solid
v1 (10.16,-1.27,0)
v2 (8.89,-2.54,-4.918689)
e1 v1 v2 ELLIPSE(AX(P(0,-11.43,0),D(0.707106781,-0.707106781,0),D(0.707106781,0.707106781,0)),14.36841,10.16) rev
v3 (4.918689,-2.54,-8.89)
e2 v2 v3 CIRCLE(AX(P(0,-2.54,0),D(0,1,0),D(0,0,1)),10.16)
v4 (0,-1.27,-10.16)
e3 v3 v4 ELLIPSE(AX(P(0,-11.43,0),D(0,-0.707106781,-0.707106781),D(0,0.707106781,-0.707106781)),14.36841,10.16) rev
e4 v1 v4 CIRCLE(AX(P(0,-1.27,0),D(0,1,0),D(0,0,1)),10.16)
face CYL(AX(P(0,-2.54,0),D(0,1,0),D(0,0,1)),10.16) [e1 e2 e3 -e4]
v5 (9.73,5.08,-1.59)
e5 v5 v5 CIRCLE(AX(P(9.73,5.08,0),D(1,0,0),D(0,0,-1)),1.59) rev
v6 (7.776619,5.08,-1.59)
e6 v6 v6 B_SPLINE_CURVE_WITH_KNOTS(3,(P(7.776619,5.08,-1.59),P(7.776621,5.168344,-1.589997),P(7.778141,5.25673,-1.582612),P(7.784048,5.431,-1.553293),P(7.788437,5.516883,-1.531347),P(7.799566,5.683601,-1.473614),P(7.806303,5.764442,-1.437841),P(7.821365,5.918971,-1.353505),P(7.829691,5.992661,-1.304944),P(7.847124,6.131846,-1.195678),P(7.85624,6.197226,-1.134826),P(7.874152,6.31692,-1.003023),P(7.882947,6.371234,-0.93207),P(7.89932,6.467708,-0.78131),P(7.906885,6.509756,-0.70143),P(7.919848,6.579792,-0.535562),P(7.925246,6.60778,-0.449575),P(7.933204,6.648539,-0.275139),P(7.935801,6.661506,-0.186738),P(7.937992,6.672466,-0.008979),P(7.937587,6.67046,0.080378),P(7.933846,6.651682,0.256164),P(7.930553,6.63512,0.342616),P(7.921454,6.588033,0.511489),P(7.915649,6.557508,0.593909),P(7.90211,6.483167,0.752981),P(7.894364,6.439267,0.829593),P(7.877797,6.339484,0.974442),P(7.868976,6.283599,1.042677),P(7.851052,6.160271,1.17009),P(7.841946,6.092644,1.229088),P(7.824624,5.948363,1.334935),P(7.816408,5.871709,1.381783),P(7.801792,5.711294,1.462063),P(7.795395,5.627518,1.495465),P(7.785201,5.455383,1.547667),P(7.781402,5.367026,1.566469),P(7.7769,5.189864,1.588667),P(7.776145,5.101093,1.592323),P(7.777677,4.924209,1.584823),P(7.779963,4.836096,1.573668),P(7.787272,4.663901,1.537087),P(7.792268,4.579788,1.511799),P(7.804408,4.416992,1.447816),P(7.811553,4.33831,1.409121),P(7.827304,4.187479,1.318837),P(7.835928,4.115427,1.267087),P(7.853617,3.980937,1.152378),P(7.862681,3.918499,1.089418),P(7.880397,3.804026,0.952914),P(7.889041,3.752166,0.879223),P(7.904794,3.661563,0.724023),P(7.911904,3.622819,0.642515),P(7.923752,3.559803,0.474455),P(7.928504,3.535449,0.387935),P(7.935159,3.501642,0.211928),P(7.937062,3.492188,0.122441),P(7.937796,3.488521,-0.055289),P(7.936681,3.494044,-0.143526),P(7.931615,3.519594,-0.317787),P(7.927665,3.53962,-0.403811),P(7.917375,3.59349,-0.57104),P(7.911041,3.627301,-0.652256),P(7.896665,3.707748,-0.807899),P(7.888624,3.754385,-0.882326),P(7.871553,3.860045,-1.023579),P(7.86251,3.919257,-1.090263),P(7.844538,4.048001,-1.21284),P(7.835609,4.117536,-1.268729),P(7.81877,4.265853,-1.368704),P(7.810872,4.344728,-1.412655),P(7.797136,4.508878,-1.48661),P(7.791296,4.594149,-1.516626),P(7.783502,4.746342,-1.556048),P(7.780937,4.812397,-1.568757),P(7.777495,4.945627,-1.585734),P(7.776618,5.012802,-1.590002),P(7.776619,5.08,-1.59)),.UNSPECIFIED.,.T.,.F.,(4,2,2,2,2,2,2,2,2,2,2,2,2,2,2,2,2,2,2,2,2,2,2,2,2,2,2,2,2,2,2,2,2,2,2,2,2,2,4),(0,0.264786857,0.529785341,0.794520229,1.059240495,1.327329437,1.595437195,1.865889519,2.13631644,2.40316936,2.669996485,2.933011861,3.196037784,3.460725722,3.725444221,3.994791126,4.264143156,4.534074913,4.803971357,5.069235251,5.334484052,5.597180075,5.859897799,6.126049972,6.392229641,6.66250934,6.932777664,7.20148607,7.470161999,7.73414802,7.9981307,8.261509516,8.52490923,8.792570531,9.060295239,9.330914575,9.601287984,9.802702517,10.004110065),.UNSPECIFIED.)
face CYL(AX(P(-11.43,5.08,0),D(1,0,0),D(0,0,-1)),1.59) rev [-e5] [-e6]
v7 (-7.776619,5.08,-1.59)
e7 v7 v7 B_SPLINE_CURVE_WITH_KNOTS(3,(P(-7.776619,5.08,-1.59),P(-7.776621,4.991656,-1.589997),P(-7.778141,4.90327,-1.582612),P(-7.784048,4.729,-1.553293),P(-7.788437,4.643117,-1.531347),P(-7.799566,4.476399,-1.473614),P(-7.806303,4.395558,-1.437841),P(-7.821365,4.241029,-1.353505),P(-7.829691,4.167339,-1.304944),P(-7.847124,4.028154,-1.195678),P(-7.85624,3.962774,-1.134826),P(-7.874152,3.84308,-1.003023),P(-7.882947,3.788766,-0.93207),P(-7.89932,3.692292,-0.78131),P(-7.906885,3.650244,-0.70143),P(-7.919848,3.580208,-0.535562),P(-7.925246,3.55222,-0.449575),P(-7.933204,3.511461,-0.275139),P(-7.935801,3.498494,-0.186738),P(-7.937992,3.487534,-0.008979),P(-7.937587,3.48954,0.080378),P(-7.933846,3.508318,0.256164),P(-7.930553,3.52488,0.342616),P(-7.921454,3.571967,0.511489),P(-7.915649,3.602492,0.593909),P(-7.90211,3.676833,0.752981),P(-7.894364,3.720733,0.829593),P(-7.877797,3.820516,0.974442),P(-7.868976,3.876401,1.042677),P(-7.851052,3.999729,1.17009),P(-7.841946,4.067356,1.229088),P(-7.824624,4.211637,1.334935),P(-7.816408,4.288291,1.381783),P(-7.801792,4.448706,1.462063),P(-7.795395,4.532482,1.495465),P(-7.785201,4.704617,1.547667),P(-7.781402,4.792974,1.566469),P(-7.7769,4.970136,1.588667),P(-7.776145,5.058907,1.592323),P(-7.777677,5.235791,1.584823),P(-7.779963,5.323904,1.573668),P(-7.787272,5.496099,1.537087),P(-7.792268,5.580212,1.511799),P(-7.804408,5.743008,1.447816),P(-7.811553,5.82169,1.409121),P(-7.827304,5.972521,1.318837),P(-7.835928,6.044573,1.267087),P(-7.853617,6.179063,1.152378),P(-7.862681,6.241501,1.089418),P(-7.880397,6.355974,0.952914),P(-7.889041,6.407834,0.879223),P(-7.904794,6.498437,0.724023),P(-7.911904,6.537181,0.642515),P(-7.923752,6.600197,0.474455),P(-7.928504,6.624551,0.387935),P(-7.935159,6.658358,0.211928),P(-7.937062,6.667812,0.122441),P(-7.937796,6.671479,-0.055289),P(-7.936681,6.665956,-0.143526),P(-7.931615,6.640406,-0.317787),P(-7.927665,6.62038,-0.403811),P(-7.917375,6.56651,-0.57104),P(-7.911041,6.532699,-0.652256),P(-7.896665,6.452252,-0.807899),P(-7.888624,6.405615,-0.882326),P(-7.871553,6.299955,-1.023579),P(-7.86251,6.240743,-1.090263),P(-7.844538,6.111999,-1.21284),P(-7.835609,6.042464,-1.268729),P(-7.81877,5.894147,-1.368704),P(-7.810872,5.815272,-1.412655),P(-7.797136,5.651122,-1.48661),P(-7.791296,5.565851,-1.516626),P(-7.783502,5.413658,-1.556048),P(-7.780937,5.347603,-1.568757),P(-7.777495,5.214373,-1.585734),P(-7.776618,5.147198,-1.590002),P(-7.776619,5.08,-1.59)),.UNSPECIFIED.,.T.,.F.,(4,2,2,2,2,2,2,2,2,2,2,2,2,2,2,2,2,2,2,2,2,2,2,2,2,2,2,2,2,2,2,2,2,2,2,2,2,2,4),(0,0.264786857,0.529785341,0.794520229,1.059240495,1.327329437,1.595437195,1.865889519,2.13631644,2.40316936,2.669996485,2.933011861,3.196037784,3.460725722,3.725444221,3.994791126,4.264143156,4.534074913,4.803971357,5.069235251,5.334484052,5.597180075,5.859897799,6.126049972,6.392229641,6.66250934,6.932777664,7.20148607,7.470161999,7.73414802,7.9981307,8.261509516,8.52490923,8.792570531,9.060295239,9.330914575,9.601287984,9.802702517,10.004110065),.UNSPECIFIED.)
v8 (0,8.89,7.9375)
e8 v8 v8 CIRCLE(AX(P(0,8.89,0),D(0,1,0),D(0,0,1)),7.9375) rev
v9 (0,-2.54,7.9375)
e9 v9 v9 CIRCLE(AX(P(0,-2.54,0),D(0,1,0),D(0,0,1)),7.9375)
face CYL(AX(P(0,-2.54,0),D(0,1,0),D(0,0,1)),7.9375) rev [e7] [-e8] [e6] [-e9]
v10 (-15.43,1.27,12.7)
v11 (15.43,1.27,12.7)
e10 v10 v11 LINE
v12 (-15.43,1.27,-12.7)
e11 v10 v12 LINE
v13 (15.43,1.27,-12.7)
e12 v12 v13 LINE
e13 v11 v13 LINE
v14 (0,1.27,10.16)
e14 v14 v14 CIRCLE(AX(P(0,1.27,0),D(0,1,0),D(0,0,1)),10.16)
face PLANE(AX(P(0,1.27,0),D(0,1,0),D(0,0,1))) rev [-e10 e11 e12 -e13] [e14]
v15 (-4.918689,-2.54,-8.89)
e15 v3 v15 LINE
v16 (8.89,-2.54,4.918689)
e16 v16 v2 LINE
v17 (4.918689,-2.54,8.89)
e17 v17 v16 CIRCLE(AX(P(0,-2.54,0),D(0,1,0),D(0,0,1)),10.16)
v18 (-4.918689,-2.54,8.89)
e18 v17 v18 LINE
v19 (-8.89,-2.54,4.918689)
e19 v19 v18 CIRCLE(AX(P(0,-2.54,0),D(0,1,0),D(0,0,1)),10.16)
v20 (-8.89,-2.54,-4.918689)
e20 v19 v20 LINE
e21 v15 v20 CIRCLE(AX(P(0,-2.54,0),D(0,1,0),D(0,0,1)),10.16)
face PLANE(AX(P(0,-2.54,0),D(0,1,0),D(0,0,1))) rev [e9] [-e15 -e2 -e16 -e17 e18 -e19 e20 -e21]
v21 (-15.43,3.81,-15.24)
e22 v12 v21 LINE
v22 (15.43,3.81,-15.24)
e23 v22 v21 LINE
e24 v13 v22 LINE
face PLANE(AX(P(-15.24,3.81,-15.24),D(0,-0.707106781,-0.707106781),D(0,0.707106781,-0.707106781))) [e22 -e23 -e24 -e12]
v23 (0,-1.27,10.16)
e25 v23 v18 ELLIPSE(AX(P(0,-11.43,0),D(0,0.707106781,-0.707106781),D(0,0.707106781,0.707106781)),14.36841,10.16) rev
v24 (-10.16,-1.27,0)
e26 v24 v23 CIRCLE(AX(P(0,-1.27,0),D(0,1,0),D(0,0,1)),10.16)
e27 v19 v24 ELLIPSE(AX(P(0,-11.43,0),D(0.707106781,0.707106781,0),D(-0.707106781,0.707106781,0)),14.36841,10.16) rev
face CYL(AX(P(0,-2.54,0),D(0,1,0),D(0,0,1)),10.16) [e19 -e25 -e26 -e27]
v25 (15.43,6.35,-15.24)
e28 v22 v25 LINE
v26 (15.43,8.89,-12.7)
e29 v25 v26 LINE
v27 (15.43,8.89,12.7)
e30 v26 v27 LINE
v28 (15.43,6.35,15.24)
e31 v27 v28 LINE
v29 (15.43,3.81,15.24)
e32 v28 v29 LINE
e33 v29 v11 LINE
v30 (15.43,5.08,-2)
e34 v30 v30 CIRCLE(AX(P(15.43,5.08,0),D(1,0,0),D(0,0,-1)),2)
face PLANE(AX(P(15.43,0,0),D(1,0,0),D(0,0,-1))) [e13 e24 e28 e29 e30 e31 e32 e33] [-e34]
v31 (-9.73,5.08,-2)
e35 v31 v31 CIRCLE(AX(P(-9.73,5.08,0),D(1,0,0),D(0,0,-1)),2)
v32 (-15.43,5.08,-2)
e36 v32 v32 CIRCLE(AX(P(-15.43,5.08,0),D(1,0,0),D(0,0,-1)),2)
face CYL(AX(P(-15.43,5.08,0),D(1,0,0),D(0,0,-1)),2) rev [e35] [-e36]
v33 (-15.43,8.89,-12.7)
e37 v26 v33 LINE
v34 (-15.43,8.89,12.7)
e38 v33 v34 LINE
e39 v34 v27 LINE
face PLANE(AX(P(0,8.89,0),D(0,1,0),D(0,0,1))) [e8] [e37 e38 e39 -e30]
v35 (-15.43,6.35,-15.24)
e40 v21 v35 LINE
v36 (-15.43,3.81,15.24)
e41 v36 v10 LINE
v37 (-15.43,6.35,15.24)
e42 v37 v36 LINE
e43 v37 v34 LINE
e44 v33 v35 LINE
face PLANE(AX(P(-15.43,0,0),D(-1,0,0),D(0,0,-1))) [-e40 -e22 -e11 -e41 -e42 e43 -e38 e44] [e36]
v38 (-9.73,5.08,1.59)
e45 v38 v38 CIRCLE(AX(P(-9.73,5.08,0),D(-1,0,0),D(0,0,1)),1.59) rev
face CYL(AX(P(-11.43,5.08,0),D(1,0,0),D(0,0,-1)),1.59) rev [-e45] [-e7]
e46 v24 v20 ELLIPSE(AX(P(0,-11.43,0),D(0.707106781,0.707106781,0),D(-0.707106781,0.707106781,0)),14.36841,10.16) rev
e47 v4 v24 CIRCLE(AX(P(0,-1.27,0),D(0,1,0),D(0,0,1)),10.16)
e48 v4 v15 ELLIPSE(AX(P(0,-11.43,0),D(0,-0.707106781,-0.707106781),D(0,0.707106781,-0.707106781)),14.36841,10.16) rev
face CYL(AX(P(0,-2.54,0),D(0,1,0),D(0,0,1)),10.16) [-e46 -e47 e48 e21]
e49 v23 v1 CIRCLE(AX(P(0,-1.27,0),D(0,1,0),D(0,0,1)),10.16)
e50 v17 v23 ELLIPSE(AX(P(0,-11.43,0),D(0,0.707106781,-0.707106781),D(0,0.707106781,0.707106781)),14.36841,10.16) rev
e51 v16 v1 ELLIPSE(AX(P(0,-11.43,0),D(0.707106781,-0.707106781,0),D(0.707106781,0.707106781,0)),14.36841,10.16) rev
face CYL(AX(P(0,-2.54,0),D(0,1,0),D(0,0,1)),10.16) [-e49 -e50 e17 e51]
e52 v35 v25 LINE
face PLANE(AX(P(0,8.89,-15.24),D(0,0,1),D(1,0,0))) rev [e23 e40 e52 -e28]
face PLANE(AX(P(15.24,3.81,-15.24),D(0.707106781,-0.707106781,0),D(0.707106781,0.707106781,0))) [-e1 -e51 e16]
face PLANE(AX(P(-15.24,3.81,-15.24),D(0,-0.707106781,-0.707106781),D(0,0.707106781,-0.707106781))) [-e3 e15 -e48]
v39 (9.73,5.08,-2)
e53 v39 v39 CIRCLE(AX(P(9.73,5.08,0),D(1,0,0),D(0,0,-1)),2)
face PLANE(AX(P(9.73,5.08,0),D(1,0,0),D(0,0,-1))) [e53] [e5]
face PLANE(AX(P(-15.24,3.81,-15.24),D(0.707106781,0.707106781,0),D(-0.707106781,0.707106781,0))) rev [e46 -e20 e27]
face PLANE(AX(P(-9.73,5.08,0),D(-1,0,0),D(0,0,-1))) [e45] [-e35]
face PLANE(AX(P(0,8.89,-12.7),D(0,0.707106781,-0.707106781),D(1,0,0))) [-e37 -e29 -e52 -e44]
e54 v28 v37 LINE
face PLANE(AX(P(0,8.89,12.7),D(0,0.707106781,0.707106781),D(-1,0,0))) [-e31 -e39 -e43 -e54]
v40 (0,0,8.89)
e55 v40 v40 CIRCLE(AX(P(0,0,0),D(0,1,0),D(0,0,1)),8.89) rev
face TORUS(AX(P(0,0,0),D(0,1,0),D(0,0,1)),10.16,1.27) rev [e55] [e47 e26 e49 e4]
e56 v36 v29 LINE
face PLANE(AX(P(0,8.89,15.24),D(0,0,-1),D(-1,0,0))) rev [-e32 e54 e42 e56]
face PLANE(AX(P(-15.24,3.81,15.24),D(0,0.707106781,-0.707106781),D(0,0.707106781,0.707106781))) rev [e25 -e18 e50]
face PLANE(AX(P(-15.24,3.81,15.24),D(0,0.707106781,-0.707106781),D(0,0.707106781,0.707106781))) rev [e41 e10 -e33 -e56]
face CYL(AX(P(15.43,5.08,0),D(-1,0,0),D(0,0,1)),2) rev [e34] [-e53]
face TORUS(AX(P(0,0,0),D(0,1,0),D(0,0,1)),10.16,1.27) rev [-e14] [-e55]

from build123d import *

# Parameters (mm, degrees)
BOSS_EXTRUDE1_DEPTH      = 2.54
BOSS_EXTRUDE1_DEPTH_BACK = 2.54
SKETCH4_R                = 10.16
CUT_EXTRUDE1_DEPTH       = 1.27
CUT_EXTRUDE1_DEPTH_BACK  = 1.27
SKETCH5_R                = 10.16
SKETCH5_R_2              = 8.89
FILLET1_R                = 1.27
SKETCH6_R                = 7.9375
CUT_EXTRUDE2_DEPTH       = 16.24
SKETCH7_W                = 30.48
SKETCH7_H                = 30.48
SKETCH7_R                = 10.16
BOSS_EXTRUDE2_DEPTH      = 1.27
BOSS_EXTRUDE3_START      = 1.27
SKETCH8_W                = 30.48
SKETCH8_H                = 30.48
SKETCH8_R                = 7.9375
BOSS_EXTRUDE3_DEPTH      = 1.27
CUT_EXTRUDE3_DEPTH       = 35.29
CUT_EXTRUDE4_DEPTH       = 22.886783683
CUT_EXTRUDE5_DEPTH       = 22.886783683
CUT_EXTRUDE6_DEPTH       = 22.886783683
SKETCH14_W               = 7.62
SKETCH14_H               = 9.930781058
CUT_EXTRUDE7_DEPTH       = 22.886783683
BOSS_EXTRUDE4_START      = 5.08
SKETCH15_W               = 22.86
SKETCH15_H               = 30.48
SKETCH15_R               = 7.9375
BOSS_EXTRUDE4_DEPTH      = 5.08
CUT_EXTRUDE8_DEPTH       = 22.022240604
CUT_EXTRUDE8_DEPTH_BACK  = 22.022240604
SKETCH16_R               = 1.59
SKETCH18_R               = 2
BOSS_EXTRUDE5_DEPTH      = 4
SKETCH19_R               = 2
CUT_EXTRUDE9_DEPTH       = 5.7
CHAMFER1_SIZE            = 2.54


with BuildPart() as part:
    # Sketch4 → Boss-Extrude1 (new, two sides: drawn at the far end of the back side and taken through both)
    with BuildSketch(Plane(origin=(0, 0, 0), x_dir=(1, 0, 0), z_dir=(0, 1, 0)).offset(-BOSS_EXTRUDE1_DEPTH_BACK)):
        with Locations(Location((0, 0, 0), (0, 0, 270))):
            Circle(SKETCH4_R)
    extrude(amount=BOSS_EXTRUDE1_DEPTH + BOSS_EXTRUDE1_DEPTH_BACK)

    # Sketch5 → Cut-Extrude1 (cut, two sides: drawn at the far end of the back side and taken through both)
    with BuildSketch(Plane(origin=(0, 0, 0), x_dir=(1, 0, 0), z_dir=(0, 1, 0)).offset(-CUT_EXTRUDE1_DEPTH_BACK)):
        with Locations(Location((0, 0, 0), (0, 0, 270))):
            Circle(SKETCH5_R)
        with Locations(Location((0, 0, 0), (0, 0, 270))):
            Circle(SKETCH5_R_2, mode=Mode.SUBTRACT)
    extrude(amount=CUT_EXTRUDE1_DEPTH + CUT_EXTRUDE1_DEPTH_BACK, mode=Mode.SUBTRACT)

    # Fillet1
    fillet1_edges = [part.edges().sort_by_distance(p)[0] for p in [
        (0, 1.27, -8.89),
        (0, -1.27, -8.89),
    ]]
    fillet(fillet1_edges, radius=FILLET1_R - 0.0001)  # a hair under: the kernel refuses the full size

    # Sketch6 → Cut-Extrude2 (cut, through all)
    with BuildSketch(Plane(origin=(0, 2.54, 0), x_dir=(1, 0, 0), z_dir=(0, 1, 0))):
        with Locations(Location((0, 0, 0), (0, 0, 270))):
            Circle(SKETCH6_R)
    extrude(amount=-CUT_EXTRUDE2_DEPTH, mode=Mode.SUBTRACT)

    # Sketch7 → Boss-Extrude2 (add)
    with BuildSketch(Plane(origin=(0, 2.54, 0), x_dir=(1, 0, 0), z_dir=(0, 1, 0))):
        Rectangle(SKETCH7_W, SKETCH7_H)
        with Locations(Location((0, 0, 0), (0, 0, 270))):
            Circle(SKETCH7_R, mode=Mode.SUBTRACT)
    extrude(amount=-BOSS_EXTRUDE2_DEPTH)

    # Sketch8 → Boss-Extrude3 (add)
    with BuildSketch(Plane(origin=(0, 2.54, 0), x_dir=(1, 0, 0), z_dir=(0, 1, 0)).offset(BOSS_EXTRUDE3_START)):
        Rectangle(SKETCH8_W, SKETCH8_H)
        with Locations(Location((0, 0, 0), (0, 0, 270))):
            Circle(SKETCH8_R, mode=Mode.SUBTRACT)
    extrude(amount=-BOSS_EXTRUDE3_DEPTH)

    # Sketch9 → Cut-Extrude3 (cut, through all)
    with BuildSketch(Plane.XY.offset(15.24)):
        Polygon((-15.24, 3.81), (-15.24, 1.27), (-12.7, 1.27), align=None)
    cut_extrude3 = extrude(amount=-CUT_EXTRUDE3_DEPTH, mode=Mode.SUBTRACT)

    # Mirror2: Cut-Extrude3 across plane
    add(cut_extrude3.mirror(Plane(origin=(0, 0, 0), x_dir=(0, 0, 1), z_dir=(1, 0, 0))), mode=Mode.SUBTRACT)

    # Sketch11 → Cut-Extrude4 (cut, symmetric)
    with BuildSketch(Plane(origin=(0, 0, 0), x_dir=(0, 0, -1), z_dir=(1, 0, 0))):
        Polygon((-15.24, 3.81), (-12.7, 1.27), (-15.24, 1.27), align=None)
    cut_extrude4 = extrude(amount=CUT_EXTRUDE4_DEPTH, both=True, mode=Mode.SUBTRACT)

    # Mirror3: Cut-Extrude4 across plane
    add(cut_extrude4.mirror(Plane.XY), mode=Mode.SUBTRACT)

    # Sketch12 → Cut-Extrude5 (cut, symmetric)
    with BuildSketch(Plane(origin=(0, 0, 0), x_dir=(0, 0, -1), z_dir=(1, 0, 0))):
        Polygon((-15.24, 3.81), (-5.498295506, -5.931704494), (-15.24, -5.931704494), align=None)
    cut_extrude5 = extrude(amount=CUT_EXTRUDE5_DEPTH, both=True, mode=Mode.SUBTRACT)

    # Mirror4: Cut-Extrude5 across plane
    add(cut_extrude5.mirror(Plane.XY), mode=Mode.SUBTRACT)

    # Sketch13 → Cut-Extrude6 (cut, symmetric)
    with BuildSketch(Plane.XY):
        Polygon((-15.24, 3.81), (-1.428921465, -10.001078535), (-15.24, -10.001078535), align=None)
    cut_extrude6 = extrude(amount=CUT_EXTRUDE6_DEPTH, both=True, mode=Mode.SUBTRACT)

    # Mirror5: Cut-Extrude6 across plane
    add(cut_extrude6.mirror(Plane(origin=(0, 0, 0), x_dir=(0, 0, 1), z_dir=(1, 0, 0))), mode=Mode.SUBTRACT)

    # Sketch14 → Cut-Extrude7 (cut, symmetric)
    with BuildSketch(Plane.XY):
        with Locations((-15.24, 3.81)):
            Rectangle(SKETCH14_W, SKETCH14_H)
    cut_extrude7 = extrude(amount=CUT_EXTRUDE7_DEPTH, both=True, mode=Mode.SUBTRACT)

    # Mirror6: Cut-Extrude7 across plane
    add(cut_extrude7.mirror(Plane(origin=(0, 0, 0), x_dir=(0, 0, 1), z_dir=(1, 0, 0))), mode=Mode.SUBTRACT)

    # Sketch15 → Boss-Extrude4 (add)
    with BuildSketch(Plane(origin=(0, 3.81, 0), x_dir=(1, 0, 0), z_dir=(0, 1, 0)).offset(BOSS_EXTRUDE4_START)):
        Rectangle(SKETCH15_W, SKETCH15_H)
        with Locations(Location((0, 0, 0), (0, 0, 270))):
            Circle(SKETCH15_R, mode=Mode.SUBTRACT)
    extrude(amount=-BOSS_EXTRUDE4_DEPTH)

    # Sketch16 → Cut-Extrude8 (cut, two sides: drawn at the far end of the back side and taken through both)
    with BuildSketch(Plane(origin=(0, 0, 0), x_dir=(0, 0, -1), z_dir=(1, 0, 0)).offset(-CUT_EXTRUDE8_DEPTH_BACK)):
        with Locations((0, 5.08)):
            Circle(SKETCH16_R)
    extrude(amount=CUT_EXTRUDE8_DEPTH + CUT_EXTRUDE8_DEPTH_BACK, mode=Mode.SUBTRACT)

    # Sketch18 → Boss-Extrude5 (add)
    with BuildSketch(Plane(origin=(11.43, 0, 0), x_dir=(0, 0, -1), z_dir=(1, 0, 0))):
        Polygon((-15.24, 3.81), (-12.7, 1.27), (12.7, 1.27), (15.24, 3.81), (15.24, 8.89), (-15.24, 8.89), align=None)
        with Locations((0, 5.08)):
            Circle(SKETCH18_R, mode=Mode.SUBTRACT)
    boss_extrude5 = extrude(amount=BOSS_EXTRUDE5_DEPTH)

    # Mirror7: Boss-Extrude5 across plane
    add(boss_extrude5.mirror(Plane(origin=(0, 0, 0), x_dir=(0, 0, 1), z_dir=(1, 0, 0))))

    # Sketch19 → Cut-Extrude9 (cut)
    with BuildSketch(Plane(origin=(15.43, 0, 0), x_dir=(0, 0, -1), z_dir=(1, 0, 0))):
        with Locations((0, 5.08)):
            Circle(SKETCH19_R)
    cut_extrude9 = extrude(amount=-CUT_EXTRUDE9_DEPTH, mode=Mode.SUBTRACT)

    # Mirror8: Cut-Extrude9 across plane
    add(cut_extrude9.mirror(Plane(origin=(0, 0, 0), x_dir=(0, 0, 1), z_dir=(1, 0, 0))), mode=Mode.SUBTRACT)

    # Chamfer1
    chamfer1_edges = [part.edges().sort_by_distance(p)[0] for p in [
        (0, 8.89, 15.24),
        (0, 8.89, -15.24),
    ]]
    chamfer(chamfer1_edges, length=CHAMFER1_SIZE)


solid = part.part
